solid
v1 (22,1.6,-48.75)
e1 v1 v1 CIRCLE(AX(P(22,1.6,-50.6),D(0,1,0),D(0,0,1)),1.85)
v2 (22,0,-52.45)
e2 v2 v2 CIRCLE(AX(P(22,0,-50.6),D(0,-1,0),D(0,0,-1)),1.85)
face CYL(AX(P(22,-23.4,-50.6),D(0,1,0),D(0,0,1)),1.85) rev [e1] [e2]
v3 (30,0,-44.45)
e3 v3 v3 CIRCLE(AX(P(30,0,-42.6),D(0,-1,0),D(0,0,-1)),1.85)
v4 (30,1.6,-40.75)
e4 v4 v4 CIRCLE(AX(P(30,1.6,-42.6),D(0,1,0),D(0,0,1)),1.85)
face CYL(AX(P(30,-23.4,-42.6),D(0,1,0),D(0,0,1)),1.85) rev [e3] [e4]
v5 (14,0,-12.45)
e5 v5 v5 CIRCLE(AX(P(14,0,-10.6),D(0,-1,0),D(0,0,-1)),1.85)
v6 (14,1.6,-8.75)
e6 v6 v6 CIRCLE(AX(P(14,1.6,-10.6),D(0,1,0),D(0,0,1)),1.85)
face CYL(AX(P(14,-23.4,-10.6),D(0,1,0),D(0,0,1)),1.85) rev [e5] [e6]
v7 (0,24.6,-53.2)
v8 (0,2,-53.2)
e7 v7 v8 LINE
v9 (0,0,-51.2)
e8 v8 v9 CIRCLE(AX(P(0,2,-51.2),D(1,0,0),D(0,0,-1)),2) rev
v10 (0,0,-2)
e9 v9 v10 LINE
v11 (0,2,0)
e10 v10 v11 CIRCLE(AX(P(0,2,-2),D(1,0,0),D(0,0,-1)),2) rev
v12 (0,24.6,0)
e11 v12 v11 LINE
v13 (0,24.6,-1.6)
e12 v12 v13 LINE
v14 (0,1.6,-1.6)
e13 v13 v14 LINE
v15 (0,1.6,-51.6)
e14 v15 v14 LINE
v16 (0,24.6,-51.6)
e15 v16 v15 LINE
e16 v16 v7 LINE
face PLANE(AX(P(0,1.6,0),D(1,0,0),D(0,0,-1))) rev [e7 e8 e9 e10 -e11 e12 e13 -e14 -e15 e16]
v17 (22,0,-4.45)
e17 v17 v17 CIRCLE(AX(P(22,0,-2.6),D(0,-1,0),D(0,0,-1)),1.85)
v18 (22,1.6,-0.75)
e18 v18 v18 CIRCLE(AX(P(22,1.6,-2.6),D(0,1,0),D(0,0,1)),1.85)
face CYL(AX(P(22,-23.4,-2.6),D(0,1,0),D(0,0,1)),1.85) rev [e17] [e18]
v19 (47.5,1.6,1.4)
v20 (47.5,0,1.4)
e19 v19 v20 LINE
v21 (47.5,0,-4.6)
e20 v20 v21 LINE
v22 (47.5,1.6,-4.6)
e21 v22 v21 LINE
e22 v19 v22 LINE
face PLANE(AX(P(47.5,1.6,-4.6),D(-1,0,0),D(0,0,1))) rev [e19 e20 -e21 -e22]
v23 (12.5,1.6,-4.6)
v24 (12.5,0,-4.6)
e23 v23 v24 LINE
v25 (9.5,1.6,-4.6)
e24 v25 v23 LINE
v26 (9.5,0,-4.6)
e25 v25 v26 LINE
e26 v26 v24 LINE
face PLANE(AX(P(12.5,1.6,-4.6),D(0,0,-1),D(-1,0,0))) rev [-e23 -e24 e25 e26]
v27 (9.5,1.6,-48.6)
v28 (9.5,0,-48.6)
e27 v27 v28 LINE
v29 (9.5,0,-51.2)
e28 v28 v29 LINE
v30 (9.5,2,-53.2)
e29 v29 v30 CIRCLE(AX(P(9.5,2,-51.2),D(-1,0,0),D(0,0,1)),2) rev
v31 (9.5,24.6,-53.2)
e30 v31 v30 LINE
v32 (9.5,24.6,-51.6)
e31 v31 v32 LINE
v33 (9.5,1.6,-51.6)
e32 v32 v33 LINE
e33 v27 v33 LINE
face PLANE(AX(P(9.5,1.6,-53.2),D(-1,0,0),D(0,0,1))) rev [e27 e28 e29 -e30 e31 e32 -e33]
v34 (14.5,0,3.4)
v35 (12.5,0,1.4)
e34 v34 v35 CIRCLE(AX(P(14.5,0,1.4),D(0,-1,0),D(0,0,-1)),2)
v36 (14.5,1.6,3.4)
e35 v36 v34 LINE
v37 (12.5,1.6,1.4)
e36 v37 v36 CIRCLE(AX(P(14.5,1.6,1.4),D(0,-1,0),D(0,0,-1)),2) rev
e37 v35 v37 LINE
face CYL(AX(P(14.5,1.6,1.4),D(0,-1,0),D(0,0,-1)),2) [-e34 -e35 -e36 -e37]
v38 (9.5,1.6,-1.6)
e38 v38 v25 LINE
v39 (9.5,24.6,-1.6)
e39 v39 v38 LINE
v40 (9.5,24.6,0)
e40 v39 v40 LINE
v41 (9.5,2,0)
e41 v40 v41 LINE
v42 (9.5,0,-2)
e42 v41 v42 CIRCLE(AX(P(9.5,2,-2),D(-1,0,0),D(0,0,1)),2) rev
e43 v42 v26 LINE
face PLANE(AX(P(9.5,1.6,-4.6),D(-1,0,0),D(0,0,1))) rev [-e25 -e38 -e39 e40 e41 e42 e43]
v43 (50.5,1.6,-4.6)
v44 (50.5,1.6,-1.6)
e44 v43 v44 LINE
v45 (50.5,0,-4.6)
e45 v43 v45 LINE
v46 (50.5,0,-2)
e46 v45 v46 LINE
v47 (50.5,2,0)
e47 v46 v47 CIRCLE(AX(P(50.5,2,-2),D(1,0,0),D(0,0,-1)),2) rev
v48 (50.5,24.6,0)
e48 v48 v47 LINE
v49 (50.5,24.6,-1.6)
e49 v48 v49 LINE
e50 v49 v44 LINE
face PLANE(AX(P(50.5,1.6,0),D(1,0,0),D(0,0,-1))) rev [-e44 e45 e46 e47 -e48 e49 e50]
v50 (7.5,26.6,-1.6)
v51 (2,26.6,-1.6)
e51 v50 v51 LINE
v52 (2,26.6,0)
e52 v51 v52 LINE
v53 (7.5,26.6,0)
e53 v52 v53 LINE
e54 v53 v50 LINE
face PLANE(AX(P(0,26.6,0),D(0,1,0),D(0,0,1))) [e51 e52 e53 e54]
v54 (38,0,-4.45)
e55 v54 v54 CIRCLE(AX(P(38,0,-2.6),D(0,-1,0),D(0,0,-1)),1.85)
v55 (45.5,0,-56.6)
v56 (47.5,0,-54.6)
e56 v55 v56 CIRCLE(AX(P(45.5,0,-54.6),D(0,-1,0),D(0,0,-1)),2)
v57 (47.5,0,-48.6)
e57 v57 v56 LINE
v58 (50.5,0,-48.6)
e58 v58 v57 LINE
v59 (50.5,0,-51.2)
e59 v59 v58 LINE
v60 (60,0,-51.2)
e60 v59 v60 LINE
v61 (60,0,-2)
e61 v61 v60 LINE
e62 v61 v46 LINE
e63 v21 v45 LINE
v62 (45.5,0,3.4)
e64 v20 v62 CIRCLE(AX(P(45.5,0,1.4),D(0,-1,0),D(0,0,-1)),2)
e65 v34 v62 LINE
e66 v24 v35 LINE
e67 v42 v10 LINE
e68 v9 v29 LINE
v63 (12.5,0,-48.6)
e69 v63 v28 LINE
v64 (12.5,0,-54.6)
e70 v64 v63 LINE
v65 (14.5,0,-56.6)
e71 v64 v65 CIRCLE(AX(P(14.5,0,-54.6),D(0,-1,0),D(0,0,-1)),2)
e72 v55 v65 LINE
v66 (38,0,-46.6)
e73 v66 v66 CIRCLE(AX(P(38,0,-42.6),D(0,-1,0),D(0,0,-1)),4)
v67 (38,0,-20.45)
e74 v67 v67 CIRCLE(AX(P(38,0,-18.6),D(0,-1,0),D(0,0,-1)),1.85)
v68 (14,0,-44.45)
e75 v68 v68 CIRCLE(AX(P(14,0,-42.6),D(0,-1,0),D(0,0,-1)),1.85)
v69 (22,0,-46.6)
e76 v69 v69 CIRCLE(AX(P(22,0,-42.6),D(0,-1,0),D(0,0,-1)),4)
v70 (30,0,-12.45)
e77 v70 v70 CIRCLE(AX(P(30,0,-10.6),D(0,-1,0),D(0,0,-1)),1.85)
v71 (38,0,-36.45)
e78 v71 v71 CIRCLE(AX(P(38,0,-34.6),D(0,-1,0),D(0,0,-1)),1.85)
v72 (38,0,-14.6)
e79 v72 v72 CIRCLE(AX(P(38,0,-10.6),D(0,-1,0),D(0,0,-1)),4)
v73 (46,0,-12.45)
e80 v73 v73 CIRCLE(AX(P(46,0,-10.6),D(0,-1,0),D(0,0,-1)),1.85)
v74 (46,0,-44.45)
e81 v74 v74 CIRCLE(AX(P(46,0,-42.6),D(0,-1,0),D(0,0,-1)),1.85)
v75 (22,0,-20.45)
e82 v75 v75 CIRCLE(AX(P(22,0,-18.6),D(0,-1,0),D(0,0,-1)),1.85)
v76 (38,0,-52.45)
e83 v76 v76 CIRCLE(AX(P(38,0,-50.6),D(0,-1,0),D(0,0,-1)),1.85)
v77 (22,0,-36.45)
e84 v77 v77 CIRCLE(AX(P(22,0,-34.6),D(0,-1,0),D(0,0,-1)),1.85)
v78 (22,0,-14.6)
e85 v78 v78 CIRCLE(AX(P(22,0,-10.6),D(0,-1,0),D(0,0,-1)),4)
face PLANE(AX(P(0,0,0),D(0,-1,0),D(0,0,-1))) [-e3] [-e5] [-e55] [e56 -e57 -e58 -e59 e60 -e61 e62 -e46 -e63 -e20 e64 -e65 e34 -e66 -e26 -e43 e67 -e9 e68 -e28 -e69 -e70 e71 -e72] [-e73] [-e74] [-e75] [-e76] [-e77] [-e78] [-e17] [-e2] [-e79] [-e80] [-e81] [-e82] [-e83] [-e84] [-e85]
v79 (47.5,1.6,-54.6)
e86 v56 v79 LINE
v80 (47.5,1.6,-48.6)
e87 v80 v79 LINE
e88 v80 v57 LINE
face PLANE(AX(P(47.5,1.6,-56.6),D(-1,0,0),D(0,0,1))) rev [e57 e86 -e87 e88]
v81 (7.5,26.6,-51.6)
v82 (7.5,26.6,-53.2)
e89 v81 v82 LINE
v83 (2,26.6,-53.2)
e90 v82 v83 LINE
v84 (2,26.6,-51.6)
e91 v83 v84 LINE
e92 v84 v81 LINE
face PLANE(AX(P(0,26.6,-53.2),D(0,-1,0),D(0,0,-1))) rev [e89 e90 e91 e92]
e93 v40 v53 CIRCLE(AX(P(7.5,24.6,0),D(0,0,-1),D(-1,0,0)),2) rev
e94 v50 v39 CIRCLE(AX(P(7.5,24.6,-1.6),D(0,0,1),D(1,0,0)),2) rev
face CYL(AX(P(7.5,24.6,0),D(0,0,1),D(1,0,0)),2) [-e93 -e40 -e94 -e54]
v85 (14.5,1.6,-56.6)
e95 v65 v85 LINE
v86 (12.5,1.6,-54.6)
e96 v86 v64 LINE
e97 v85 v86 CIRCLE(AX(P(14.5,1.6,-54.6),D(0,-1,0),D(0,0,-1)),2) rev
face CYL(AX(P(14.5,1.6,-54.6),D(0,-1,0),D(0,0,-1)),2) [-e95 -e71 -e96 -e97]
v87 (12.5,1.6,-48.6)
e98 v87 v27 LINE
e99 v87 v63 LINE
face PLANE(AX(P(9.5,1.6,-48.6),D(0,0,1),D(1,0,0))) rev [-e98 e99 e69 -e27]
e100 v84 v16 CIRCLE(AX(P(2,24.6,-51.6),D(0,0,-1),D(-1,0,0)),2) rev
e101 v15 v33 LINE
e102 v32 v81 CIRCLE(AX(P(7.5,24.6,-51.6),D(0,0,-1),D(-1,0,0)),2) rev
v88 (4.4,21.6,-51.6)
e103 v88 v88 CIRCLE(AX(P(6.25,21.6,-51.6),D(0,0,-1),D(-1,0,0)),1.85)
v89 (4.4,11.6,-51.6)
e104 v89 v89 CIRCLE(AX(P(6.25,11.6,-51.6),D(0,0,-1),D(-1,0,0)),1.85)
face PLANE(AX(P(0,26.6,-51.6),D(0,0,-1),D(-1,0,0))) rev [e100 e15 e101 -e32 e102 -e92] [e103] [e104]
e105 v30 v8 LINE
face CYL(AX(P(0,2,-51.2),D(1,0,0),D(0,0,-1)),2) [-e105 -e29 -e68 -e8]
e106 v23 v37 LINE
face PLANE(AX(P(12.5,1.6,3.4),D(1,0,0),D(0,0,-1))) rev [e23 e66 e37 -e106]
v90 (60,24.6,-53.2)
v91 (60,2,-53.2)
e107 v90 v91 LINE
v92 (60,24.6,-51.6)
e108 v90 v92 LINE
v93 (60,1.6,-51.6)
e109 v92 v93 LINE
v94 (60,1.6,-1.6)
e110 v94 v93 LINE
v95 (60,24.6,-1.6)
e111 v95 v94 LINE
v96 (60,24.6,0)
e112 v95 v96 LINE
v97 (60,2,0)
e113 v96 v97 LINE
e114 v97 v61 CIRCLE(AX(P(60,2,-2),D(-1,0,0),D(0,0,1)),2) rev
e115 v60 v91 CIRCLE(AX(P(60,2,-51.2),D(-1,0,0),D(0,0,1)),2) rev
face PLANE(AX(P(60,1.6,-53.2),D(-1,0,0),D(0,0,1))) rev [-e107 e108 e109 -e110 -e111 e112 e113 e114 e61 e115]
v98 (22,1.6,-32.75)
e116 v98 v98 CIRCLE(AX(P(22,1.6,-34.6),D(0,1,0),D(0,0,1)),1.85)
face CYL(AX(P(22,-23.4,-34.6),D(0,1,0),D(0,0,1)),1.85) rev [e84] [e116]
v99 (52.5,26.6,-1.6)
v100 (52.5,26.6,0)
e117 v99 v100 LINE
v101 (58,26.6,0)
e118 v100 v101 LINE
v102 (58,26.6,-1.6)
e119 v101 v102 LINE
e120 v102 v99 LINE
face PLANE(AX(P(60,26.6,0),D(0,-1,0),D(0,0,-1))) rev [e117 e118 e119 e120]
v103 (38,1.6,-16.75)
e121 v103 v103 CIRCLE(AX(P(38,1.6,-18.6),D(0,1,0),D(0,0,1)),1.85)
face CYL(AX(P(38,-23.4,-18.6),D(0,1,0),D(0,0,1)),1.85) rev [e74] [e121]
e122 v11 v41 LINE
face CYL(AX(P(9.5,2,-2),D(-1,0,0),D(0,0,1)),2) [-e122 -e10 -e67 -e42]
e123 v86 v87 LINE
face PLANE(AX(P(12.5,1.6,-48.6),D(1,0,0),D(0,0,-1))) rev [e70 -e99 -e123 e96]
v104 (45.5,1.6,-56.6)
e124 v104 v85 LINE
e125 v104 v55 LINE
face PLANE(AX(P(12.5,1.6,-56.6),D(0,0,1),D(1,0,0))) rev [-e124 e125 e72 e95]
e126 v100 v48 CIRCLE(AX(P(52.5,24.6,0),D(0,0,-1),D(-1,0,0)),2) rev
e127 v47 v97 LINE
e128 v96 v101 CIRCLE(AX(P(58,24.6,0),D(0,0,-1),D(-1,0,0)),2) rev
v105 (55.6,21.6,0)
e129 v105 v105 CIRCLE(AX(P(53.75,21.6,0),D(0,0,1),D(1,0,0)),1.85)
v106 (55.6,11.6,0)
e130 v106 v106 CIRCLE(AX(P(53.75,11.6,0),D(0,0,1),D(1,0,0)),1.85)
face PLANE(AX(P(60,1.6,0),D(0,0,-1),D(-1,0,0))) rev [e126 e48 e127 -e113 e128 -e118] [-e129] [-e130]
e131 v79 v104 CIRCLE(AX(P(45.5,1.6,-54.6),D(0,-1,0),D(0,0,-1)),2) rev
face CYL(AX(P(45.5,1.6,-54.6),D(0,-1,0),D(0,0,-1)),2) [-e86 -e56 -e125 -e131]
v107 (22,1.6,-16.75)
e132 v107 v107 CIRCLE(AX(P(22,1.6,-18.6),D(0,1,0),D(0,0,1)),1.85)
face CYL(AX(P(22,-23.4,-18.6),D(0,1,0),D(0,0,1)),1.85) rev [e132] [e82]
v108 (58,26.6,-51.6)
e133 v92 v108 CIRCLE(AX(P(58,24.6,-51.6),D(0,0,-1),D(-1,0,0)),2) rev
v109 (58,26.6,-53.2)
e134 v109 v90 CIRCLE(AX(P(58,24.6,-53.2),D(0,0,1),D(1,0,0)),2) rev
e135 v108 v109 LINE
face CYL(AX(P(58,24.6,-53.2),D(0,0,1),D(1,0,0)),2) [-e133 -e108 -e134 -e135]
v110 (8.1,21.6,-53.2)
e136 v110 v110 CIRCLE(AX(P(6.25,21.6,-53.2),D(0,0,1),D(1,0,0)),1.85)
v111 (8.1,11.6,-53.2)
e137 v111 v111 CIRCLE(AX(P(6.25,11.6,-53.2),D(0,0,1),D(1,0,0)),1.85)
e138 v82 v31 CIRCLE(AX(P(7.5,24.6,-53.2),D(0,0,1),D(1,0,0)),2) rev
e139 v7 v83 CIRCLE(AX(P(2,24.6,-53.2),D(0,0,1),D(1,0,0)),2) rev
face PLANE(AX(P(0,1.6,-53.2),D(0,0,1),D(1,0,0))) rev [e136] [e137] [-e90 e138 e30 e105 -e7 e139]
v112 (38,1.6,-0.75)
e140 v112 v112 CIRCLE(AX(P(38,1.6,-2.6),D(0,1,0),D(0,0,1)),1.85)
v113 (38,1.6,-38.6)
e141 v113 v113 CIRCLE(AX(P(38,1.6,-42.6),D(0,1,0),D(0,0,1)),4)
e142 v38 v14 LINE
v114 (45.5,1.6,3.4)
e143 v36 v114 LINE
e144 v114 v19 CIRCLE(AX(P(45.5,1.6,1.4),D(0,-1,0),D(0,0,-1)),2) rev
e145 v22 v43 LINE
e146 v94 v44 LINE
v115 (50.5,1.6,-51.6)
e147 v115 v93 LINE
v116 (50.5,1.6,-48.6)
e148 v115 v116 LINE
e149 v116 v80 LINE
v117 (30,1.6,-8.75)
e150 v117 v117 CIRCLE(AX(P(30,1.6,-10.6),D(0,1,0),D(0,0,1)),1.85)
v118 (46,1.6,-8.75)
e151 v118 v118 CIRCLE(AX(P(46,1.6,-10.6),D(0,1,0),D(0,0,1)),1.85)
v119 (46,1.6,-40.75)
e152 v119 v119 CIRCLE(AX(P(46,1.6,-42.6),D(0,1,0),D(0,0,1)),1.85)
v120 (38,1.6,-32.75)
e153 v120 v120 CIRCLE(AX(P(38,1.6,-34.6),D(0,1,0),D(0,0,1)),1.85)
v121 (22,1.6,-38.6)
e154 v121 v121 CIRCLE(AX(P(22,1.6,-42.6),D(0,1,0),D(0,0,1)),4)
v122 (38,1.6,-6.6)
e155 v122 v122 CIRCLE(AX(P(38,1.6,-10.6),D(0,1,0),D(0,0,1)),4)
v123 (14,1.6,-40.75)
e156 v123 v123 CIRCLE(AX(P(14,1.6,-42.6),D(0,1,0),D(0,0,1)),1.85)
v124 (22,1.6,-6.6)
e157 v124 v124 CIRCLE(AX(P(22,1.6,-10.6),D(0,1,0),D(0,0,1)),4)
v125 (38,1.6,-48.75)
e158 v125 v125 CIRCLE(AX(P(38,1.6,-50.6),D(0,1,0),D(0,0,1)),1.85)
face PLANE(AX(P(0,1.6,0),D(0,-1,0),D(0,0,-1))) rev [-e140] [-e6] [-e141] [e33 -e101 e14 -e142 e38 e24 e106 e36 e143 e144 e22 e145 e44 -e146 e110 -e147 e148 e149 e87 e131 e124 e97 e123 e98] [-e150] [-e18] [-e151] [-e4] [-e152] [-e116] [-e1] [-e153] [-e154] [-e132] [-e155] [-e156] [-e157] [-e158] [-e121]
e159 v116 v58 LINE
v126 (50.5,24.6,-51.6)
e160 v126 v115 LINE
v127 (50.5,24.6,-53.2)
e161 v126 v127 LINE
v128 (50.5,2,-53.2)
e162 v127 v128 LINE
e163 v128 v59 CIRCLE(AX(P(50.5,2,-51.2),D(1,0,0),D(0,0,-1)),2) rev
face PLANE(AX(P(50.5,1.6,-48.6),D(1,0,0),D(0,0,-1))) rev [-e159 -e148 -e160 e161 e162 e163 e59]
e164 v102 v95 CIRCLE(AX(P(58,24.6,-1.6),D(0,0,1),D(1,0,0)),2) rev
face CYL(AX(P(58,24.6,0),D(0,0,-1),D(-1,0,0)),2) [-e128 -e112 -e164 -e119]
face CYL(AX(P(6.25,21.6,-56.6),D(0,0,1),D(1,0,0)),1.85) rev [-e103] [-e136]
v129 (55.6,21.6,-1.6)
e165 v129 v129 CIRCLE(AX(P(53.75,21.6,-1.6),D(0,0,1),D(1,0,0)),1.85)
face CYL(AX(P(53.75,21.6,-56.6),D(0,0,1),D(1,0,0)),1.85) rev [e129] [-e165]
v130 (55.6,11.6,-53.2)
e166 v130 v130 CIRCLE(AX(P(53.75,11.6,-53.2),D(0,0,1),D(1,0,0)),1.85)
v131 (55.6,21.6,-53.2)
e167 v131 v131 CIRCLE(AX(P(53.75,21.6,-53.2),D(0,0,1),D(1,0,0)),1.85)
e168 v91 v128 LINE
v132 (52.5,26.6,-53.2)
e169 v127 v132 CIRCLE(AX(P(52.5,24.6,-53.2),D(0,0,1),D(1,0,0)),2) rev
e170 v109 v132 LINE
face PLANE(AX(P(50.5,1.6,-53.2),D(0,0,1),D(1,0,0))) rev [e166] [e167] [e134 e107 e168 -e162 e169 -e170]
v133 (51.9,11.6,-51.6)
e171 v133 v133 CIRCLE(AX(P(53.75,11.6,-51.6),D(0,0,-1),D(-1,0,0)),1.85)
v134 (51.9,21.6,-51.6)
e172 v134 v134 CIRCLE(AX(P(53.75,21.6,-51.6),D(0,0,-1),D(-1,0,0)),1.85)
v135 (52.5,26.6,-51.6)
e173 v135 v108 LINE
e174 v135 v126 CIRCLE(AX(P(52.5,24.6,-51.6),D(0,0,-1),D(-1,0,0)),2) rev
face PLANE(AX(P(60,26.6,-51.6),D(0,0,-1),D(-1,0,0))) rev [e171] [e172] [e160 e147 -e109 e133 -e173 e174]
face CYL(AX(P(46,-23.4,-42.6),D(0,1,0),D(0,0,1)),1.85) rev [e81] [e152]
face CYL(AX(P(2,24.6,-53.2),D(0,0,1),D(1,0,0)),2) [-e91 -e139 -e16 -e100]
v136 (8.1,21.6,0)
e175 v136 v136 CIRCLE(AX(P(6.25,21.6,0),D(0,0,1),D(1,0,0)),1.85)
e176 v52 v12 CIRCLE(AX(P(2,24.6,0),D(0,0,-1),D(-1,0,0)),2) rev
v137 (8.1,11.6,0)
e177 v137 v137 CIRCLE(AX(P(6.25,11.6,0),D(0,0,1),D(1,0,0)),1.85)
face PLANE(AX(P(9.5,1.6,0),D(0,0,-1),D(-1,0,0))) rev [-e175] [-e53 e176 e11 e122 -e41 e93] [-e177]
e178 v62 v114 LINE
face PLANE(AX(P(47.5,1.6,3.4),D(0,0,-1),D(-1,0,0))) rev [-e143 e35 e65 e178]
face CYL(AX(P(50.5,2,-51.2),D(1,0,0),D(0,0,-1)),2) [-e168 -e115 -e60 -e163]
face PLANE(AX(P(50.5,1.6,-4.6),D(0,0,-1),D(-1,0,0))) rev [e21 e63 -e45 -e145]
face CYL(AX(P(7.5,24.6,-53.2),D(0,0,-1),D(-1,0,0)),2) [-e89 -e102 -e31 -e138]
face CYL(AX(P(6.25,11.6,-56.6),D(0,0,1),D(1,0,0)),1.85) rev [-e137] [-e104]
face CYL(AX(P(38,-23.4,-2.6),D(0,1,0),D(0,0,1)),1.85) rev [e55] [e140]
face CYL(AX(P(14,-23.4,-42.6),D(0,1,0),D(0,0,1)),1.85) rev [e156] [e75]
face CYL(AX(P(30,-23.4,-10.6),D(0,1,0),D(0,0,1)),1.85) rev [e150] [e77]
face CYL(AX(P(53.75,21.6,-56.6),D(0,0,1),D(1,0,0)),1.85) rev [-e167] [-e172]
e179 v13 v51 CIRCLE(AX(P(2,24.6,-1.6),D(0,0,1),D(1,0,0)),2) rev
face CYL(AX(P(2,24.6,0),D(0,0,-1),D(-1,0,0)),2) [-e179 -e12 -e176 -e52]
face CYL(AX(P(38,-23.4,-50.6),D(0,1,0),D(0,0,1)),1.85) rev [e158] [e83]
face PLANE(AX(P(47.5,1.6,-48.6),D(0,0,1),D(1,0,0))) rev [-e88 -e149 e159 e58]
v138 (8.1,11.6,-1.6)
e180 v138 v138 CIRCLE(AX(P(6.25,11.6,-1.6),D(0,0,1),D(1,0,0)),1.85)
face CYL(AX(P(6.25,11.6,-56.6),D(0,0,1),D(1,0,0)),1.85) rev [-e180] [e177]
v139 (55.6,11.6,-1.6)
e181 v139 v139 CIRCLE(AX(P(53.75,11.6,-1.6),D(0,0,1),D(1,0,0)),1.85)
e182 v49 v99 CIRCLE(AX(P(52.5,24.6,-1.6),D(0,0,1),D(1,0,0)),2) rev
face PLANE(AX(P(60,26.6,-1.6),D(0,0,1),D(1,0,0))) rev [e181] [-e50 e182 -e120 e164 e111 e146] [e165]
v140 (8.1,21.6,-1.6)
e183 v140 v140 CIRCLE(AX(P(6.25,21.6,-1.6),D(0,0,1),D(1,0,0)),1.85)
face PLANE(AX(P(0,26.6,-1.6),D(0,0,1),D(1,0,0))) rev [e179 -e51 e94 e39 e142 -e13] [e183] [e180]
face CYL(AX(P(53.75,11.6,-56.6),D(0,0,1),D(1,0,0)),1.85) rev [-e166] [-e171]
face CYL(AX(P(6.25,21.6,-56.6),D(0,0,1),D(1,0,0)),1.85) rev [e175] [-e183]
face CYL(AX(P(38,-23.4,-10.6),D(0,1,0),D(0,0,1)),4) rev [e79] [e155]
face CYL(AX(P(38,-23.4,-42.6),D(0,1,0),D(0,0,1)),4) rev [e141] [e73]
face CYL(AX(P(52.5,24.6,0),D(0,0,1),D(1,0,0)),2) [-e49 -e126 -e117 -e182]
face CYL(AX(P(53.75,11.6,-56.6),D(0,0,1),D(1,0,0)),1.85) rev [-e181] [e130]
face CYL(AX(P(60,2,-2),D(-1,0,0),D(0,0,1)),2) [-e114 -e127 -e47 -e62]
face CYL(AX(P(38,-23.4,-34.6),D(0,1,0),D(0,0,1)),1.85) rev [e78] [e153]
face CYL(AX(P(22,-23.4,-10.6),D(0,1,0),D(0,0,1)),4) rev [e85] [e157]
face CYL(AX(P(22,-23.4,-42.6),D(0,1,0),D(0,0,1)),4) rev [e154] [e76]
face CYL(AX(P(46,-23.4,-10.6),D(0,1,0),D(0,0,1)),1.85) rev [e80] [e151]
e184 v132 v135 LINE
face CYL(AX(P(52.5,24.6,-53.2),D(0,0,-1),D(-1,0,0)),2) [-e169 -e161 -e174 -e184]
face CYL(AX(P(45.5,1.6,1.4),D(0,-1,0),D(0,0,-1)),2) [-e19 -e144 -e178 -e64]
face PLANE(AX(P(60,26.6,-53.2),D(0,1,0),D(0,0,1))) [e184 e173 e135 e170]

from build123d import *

# Parameters (mm, degrees)
EXTRUDE1_DEPTH           = 1.6
SKETCH4_W                = 9.5
SKETCH4_H                = 1.6
EXTRUDE2_DEPTH           = 25
SKETCH5_R                = 1.85
CUT_EXTRUDE1_DEPTH       = 87.666717949
CUT_EXTRUDE2_START       = -1.6
CUT_EXTRUDE2_OUTLINE_R   = 1.85
CUT_EXTRUDE2_OUTLINE_R_2 = 4
CUT_EXTRUDE2_DEPTH       = 1.6
FILLET1_R                = 2
FILLET2_R                = 2
FILLET3_R                = 2
FILLET4_R                = 2
FILLET5_R                = 2
FILLET6_R                = 2
FILLET7_R                = 2
FILLET8_R                = 2


# Read off the part's stored shape, not the designer's step: Cut-Extrude2
with BuildPart() as part:
    # Sketch1 → Extrude1 (new body)
    with BuildSketch(Plane(origin=(0, 0, 0), x_dir=(1, 0, 0), z_dir=(0, 1, 0))):
        Polygon((0, 0), (0, 53.2), (9.5, 53.2), (9.5, 48.6), (12.5, 48.6), (12.5, 56.6), (47.5, 56.6), (47.5, 48.6), (50.5, 48.6), (50.5, 53.2), (60, 53.2), (60, 0), (50.5, 0), (50.5, 4.6), (47.5, 4.6), (47.5, -3.4), (12.5, -3.4), (12.5, 4.6), (9.5, 4.6), (9.5, 0), align=None)
    extrude(amount=EXTRUDE1_DEPTH)

    # Sketch4 → Extrude2 (add)
    with BuildSketch(Plane(origin=(0, 1.6, 0), x_dir=(1, 0, 0), z_dir=(0, 1, 0))):
        with Locations((4.75, 52.4)):
            Rectangle(SKETCH4_W, SKETCH4_H)
        with Locations((55.25, 52.4)):
            Rectangle(SKETCH4_W, SKETCH4_H)
        with Locations((55.25, 0.8)):
            Rectangle(SKETCH4_W, SKETCH4_H)
        with Locations((4.75, 0.8)):
            Rectangle(SKETCH4_W, SKETCH4_H)
    extrude(amount=EXTRUDE2_DEPTH)

    # Sketch5 → Cut-Extrude1 (cut, through all)
    with BuildSketch(Plane.XY):
        with Locations((6.25, 21.6)):
            Circle(SKETCH5_R)
        with Locations((6.25, 11.6)):
            Circle(SKETCH5_R)
        with Locations((53.75, 21.6)):
            Circle(SKETCH5_R)
        with Locations((53.75, 11.6)):
            Circle(SKETCH5_R)
    extrude(amount=-CUT_EXTRUDE1_DEPTH, mode=Mode.SUBTRACT)

    # Cut-Extrude2 outline → Cut-Extrude2 (cut)
    with BuildSketch(Plane(origin=(0, 1.6, 0), x_dir=(1, 0, 0), z_dir=(0, 1, 0)).offset(CUT_EXTRUDE2_START)):
        with Locations((14, 10.6)):
            Circle(CUT_EXTRUDE2_OUTLINE_R)
        with Locations((14, 42.6)):
            Circle(CUT_EXTRUDE2_OUTLINE_R)
        with Locations((22, 42.6)):
            Circle(CUT_EXTRUDE2_OUTLINE_R_2)
        with Locations((30, 42.6)):
            Circle(CUT_EXTRUDE2_OUTLINE_R)
        with Locations((22, 34.6)):
            Circle(CUT_EXTRUDE2_OUTLINE_R)
        with Locations((22, 50.6)):
            Circle(CUT_EXTRUDE2_OUTLINE_R)
        with Locations((22, 10.6)):
            Circle(CUT_EXTRUDE2_OUTLINE_R_2)
        with Locations((30, 10.6)):
            Circle(CUT_EXTRUDE2_OUTLINE_R)
        with Locations((22, 2.6)):
            Circle(CUT_EXTRUDE2_OUTLINE_R)
        with Locations((22, 18.6)):
            Circle(CUT_EXTRUDE2_OUTLINE_R)
        with Locations((38, 10.6)):
            Circle(CUT_EXTRUDE2_OUTLINE_R_2)
        with Locations((46, 10.6)):
            Circle(CUT_EXTRUDE2_OUTLINE_R)
        with Locations((38, 2.6)):
            Circle(CUT_EXTRUDE2_OUTLINE_R)
        with Locations((38, 18.6)):
            Circle(CUT_EXTRUDE2_OUTLINE_R)
        with Locations((38, 42.6)):
            Circle(CUT_EXTRUDE2_OUTLINE_R_2)
        with Locations((46, 42.6)):
            Circle(CUT_EXTRUDE2_OUTLINE_R)
        with Locations((38, 34.6)):
            Circle(CUT_EXTRUDE2_OUTLINE_R)
        with Locations((38, 50.6)):
            Circle(CUT_EXTRUDE2_OUTLINE_R)
    extrude(amount=CUT_EXTRUDE2_DEPTH, mode=Mode.SUBTRACT)

    # Fillet1
    fillet1_edges = [part.edges().sort_by_distance(p)[0] for p in [
        (60, 26.6, -0.8),
    ]]
    fillet(fillet1_edges, radius=FILLET1_R)

    # Fillet2
    fillet2_edges = [part.edges().sort_by_distance(p)[0] for p in [
        (60, 26.6, -52.4),
        (9.5, 26.6, -52.4),
        (9.5, 26.6, -0.8),
    ]]
    fillet(fillet2_edges, radius=FILLET2_R)

    # Fillet3
    fillet3_edges = [part.edges().sort_by_distance(p)[0] for p in [
        (47.5, 0.8, 3.4),
    ]]
    fillet(fillet3_edges, radius=FILLET3_R)

    # Fillet4
    fillet4_edges = [part.edges().sort_by_distance(p)[0] for p in [
        (12.5, 0.8, 3.4),
        (50.5, 26.6, -0.8),
        (0, 26.6, -0.8),
        (0, 26.6, -52.4),
        (50.5, 26.6, -52.4),
    ]]
    fillet(fillet4_edges, radius=FILLET4_R)

    # Fillet5
    fillet5_edges = [part.edges().sort_by_distance(p)[0] for p in [
        (12.5, 0.8, -56.6),
    ]]
    fillet(fillet5_edges, radius=FILLET5_R)

    # Fillet6
    fillet6_edges = [part.edges().sort_by_distance(p)[0] for p in [
        (47.5, 0.8, -56.6),
    ]]
    fillet(fillet6_edges, radius=FILLET6_R)

    # Fillet7
    fillet7_edges = [part.edges().sort_by_distance(p)[0] for p in [
        (55.25, 0, 0),
        (4.75, 0, 0),
    ]]
    fillet(fillet7_edges, radius=FILLET7_R)

    # Fillet8
    fillet8_edges = [part.edges().sort_by_distance(p)[0] for p in [
        (4.75, 0, -53.2),
        (55.25, 0, -53.2),
    ]]
    fillet(fillet8_edges, radius=FILLET8_R)


solid = part.part
